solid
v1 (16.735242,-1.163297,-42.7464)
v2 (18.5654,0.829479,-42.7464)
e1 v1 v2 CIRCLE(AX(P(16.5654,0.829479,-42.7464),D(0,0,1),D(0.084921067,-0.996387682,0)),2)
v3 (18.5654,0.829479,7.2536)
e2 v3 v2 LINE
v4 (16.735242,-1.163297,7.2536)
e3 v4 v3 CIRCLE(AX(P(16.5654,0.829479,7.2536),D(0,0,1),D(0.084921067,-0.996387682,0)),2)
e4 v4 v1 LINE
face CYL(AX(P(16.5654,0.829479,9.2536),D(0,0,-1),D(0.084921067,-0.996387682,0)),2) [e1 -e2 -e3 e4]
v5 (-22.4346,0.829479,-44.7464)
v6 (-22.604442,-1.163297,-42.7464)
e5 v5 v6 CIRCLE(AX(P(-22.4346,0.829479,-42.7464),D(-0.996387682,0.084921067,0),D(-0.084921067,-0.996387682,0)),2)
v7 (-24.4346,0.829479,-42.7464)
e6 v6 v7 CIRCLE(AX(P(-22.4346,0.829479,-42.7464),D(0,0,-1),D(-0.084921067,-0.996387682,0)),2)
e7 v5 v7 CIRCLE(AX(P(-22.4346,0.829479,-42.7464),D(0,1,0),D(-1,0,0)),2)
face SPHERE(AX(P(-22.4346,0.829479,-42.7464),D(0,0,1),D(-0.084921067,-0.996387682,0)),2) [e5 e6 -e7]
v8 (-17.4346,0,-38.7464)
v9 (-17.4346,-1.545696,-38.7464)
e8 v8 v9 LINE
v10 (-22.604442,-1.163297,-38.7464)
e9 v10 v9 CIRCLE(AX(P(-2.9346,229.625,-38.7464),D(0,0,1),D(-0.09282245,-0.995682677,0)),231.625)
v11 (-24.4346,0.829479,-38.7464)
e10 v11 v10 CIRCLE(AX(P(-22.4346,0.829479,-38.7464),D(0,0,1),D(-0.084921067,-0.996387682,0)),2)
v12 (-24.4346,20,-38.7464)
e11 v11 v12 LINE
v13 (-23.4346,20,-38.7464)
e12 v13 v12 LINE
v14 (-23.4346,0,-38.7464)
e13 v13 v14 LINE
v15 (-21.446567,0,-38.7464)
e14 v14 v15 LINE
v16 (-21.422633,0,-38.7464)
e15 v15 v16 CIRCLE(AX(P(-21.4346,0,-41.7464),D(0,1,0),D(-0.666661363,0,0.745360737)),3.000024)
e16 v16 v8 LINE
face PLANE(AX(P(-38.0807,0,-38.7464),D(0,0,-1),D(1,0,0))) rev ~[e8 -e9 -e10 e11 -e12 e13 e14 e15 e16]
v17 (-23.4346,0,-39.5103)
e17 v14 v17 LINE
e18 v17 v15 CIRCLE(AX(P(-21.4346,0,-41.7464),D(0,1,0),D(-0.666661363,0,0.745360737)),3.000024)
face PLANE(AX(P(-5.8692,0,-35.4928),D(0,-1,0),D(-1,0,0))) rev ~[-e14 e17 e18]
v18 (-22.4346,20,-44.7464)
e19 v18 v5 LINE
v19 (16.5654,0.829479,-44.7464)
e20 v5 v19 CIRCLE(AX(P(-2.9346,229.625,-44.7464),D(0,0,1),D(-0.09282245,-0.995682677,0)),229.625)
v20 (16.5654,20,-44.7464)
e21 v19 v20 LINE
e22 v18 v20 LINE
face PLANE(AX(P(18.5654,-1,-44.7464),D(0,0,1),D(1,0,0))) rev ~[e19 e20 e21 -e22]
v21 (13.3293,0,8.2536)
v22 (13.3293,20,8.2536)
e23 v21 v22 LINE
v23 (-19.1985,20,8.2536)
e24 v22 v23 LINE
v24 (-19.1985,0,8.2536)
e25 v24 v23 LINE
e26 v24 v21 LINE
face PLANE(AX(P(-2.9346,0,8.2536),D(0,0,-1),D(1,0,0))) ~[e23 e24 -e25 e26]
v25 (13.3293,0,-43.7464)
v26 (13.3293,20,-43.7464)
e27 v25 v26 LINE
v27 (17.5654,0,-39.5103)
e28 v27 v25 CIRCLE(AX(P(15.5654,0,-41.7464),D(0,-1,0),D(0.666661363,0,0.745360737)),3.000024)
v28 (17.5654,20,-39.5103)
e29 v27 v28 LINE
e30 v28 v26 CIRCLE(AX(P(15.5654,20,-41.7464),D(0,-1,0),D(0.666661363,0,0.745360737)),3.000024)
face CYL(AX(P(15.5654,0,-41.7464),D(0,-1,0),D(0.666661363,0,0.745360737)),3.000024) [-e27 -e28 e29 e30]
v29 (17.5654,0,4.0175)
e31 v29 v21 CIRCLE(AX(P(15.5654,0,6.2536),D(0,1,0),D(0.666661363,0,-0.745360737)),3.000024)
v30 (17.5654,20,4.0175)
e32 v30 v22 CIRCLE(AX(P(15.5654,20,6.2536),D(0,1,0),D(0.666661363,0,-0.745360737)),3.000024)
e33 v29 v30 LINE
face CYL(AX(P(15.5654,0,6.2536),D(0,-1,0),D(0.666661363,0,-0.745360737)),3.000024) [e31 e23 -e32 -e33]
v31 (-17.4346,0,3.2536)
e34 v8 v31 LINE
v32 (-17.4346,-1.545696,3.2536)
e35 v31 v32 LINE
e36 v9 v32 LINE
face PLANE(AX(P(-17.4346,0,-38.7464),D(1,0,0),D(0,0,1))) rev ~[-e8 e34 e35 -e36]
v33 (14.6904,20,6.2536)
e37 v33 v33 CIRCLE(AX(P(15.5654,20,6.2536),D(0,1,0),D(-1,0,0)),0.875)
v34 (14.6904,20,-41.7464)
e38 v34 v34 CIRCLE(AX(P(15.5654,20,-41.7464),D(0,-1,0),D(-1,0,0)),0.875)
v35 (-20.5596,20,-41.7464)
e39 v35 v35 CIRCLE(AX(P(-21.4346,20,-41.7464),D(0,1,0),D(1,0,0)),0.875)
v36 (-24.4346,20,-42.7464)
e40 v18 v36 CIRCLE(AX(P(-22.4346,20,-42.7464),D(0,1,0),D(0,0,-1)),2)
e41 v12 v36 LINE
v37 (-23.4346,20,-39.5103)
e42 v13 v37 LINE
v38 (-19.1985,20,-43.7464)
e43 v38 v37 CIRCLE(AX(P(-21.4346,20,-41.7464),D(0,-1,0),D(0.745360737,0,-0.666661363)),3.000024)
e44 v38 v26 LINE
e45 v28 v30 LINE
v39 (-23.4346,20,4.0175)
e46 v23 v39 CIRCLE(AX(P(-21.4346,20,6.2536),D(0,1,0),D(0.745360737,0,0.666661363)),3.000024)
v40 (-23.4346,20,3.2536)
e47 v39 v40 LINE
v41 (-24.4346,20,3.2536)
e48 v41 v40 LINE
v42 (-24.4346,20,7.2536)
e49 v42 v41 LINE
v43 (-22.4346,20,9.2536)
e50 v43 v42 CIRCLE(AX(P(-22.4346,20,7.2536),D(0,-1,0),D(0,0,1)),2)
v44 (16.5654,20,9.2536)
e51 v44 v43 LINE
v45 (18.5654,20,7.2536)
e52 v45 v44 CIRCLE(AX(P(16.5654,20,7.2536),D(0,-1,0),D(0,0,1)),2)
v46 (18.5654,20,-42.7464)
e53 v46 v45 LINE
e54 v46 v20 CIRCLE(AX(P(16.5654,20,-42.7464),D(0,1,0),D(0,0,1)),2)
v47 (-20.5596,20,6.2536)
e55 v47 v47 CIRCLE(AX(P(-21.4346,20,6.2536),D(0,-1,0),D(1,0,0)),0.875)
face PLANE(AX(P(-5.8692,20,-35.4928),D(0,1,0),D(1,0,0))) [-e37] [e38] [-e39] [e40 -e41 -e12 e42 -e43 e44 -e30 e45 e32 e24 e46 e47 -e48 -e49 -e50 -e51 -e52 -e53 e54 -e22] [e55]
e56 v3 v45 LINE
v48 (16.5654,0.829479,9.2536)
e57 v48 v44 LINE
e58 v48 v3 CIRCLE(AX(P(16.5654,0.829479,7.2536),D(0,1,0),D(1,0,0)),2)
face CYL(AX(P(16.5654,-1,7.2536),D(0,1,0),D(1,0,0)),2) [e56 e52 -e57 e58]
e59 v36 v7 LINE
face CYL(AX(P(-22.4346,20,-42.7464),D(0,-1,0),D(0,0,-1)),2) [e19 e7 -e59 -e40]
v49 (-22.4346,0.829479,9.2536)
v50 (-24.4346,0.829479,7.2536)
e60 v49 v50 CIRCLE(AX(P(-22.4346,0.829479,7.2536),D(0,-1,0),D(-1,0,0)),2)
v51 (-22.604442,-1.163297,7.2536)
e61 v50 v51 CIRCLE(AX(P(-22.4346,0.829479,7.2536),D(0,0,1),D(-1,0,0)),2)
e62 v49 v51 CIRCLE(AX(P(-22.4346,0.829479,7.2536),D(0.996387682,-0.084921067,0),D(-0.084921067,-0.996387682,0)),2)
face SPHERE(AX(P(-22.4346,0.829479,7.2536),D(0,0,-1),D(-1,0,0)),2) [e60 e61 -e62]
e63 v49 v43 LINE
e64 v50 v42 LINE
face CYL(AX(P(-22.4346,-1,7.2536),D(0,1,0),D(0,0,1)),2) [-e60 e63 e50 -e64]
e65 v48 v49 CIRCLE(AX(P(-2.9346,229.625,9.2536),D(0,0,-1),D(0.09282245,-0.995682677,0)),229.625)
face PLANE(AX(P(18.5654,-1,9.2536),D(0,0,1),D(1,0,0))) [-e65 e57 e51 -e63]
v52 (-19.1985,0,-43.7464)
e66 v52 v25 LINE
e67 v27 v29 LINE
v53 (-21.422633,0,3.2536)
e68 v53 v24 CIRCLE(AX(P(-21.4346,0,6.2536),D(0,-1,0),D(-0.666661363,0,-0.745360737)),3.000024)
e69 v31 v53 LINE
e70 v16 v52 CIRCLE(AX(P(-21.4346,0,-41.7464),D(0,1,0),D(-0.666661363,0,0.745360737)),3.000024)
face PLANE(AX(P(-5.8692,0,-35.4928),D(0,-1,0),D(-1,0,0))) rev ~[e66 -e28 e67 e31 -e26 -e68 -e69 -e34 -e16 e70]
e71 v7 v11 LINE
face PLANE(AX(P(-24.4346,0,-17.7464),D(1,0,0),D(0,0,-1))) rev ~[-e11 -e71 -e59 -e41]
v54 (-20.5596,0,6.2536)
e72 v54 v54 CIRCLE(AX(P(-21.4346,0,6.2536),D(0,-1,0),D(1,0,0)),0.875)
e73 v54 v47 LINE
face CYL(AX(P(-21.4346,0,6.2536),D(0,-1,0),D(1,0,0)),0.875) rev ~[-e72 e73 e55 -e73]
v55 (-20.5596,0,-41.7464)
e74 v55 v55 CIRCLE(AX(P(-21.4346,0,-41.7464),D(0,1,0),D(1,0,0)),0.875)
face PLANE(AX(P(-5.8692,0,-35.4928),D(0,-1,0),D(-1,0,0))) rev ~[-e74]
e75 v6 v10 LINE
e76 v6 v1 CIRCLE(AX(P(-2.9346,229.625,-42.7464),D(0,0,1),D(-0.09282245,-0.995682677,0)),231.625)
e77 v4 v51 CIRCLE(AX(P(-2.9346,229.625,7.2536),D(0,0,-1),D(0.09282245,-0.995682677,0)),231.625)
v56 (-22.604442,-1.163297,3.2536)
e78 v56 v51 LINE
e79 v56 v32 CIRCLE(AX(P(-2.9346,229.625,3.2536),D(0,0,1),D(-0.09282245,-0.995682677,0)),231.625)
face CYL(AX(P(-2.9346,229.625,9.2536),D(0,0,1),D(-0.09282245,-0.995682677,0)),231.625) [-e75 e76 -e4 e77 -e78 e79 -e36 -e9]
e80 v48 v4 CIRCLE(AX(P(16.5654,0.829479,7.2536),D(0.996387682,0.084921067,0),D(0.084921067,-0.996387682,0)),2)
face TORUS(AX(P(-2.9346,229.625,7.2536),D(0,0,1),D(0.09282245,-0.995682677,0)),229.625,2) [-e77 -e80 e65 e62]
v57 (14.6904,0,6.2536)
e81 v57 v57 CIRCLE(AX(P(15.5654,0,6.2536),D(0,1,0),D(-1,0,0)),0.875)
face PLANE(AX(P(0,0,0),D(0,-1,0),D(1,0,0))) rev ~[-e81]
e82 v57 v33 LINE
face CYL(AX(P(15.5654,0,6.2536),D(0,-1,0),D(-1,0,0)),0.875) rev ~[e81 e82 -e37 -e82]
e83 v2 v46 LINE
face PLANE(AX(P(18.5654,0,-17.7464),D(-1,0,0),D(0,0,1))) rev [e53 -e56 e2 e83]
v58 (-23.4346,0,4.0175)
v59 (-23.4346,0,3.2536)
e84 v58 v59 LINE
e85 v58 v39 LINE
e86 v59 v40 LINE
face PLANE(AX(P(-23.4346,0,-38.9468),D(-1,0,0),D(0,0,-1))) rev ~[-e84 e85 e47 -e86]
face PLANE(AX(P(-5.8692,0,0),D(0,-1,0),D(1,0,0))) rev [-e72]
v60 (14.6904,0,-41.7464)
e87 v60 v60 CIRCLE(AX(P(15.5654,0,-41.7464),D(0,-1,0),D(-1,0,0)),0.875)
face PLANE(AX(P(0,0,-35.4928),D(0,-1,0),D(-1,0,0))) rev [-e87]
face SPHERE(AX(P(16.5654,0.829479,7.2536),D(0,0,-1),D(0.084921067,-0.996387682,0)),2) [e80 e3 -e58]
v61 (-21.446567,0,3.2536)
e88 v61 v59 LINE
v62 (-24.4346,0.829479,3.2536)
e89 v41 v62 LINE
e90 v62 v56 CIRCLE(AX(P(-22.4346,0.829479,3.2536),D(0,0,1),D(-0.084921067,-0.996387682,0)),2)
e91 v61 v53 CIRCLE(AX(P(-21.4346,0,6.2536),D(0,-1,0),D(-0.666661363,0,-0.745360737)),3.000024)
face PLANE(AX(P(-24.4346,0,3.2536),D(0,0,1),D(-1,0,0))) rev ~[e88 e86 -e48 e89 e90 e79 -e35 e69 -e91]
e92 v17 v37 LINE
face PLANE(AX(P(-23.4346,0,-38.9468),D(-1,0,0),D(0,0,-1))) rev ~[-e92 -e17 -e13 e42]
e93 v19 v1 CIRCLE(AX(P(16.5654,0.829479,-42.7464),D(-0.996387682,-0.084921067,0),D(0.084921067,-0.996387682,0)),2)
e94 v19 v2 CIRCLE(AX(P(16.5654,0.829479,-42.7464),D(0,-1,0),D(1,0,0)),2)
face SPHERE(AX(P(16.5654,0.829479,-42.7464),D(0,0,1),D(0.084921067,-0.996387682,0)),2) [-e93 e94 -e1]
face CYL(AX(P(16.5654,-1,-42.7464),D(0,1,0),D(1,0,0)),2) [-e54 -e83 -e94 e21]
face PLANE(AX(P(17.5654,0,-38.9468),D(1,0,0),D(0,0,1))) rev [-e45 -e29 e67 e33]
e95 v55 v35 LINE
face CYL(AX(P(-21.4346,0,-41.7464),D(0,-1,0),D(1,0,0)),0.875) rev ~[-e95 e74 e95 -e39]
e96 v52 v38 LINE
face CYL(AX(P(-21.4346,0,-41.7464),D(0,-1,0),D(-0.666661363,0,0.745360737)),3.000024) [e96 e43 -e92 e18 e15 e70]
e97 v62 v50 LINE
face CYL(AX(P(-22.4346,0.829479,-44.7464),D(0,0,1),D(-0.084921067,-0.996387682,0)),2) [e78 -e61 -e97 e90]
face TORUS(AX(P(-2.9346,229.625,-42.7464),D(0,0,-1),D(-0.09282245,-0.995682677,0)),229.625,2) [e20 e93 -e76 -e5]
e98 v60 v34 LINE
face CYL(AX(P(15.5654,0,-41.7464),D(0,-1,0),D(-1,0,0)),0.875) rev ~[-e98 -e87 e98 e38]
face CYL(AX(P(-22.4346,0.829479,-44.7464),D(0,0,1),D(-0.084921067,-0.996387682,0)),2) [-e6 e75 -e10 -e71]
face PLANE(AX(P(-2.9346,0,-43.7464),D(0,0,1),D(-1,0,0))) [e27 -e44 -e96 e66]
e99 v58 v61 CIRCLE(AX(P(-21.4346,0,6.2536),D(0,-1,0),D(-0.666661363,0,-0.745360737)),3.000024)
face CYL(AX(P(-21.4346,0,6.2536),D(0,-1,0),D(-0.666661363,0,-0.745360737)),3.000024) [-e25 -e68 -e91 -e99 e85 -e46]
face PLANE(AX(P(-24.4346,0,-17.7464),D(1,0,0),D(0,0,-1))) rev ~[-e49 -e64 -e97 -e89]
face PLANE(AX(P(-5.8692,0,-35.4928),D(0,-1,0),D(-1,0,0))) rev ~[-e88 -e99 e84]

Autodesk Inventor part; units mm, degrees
ref_plane "YZ Plane" through (0, 0, 0) normal (1, 0, 0) x (0, 1, 0)
ref_plane "XZ Plane" through (0, 0, 0) normal (0, 1, 0) x (-1, 0, 0)
ref_plane "XY Plane" through (0, 0, 0) normal (0, 0, 1) x (1, 0, 0)
sketch "Sketch1" plane through (0, 0, 0) normal (0, 1, 0) x (-1, 0, 0)
  line L0 (-18.5654, 9.2536) -> (2.9346, 9.2536)
  line L1 (2.9346, 9.2536) -> (2.9346, -17.7464)
  line L2 (2.9346, -17.7464) -> (-18.5654, -17.7464)
  line L3 (-18.5654, -17.7464) -> (-18.5654, 9.2536)
  circle A0 centre (-15.5654, 6.2536) radius 0.875
  line L4 (-17.5654, 3.454) -> (-17.5654, -16.6136)
  line L5 (2.9346, 8.2536) -> (-13.3293, 8.2536)
  line L6 (-17.5654, 3.454) -> (-17.5654, 4.0175)
  line L7 (-17.5654, -16.6136) -> (-17.5654, -17.7464)
  arc A1 (-17.5654, 4.0175) -> (-13.3293, 8.2536) centre (-15.5654, 6.2536) ccw
  point P0 (0, 0)
  dimension "d0" = 21.5
  dimension "d2" = 27
  dimension "d3" = 3
  dimension "d4" = 3
  dimension "d6" = 1.75
  dimension "d7" = 1
  dimension "d8" = 1
extrude "Extrusion1" add sketch "Sketch1" along normal blind 20 contours L0 L1 L5 A1 L6 L4 L7 L2 L3
sketch "Sketch2" plane through (0, 0, 0) normal (0, -1, 0) x (1, 0, 0)
  line L0 (18.5654, 9.2536) -> (-2.9346, 9.2536)
  line L1 (-2.9346, 9.2536) -> (-2.9346, -17.7464)
  line L2 (-2.9346, -17.7464) -> (18.5654, -17.7464)
  line L3 (18.5654, -17.7464) -> (18.5654, 9.2536)
  point P0 (0, 0)
extrude "Extrusion2" add sketch "Sketch2" along normal blind 1
mirror "Mirror1" about plane through (18.5654, 0, -17.7464) normal (0, 0, -1) of "Extrusion1", "Extrusion2"
mirror "Mirror2" about plane through (-2.9346, 0, 8.2536) normal (-1, 0, 0) of "Extrusion1", "Extrusion2", "Mirror1"
sketch "Sketch3" plane through (18.5654, -1, 9.2536) normal (0, 0, 1) x (1, 0, 0)
  line L0 (0, 0) -> (-43, 0) projected
  arc A0 (-43, 0) -> (0, 0) centre (-21.5, 230.625) ccw
  line L1 (-40.8006, -1) -> (-1.6118, -1)
  point P0 (-18.5654, 1)
  dimension "d13" = 1
extrude "Extrusion3" add sketch "Sketch3" against normal blind 54
fillet "Fillet1" radius 2 8 edges at (-24.4346, -1, -17.7464) (-2.9346, -2, -44.7464) (-24.4346, 9.5, -44.7464) (18.5654, 9.5, -44.7464) (-24.4346, 9.5, 9.2536) (-2.9346, -2, 9.2536) (18.5654, 9.5, 9.2536) (18.5654, -1, -17.7464)
sketch "Sketch4" plane through (0, 0, 0) normal (0, 1, 0) x (1, 0, 0)
  line L0 (-38.0807, 38.7464) -> (-17.4346, 38.7464)
  line L1 (-17.4346, 38.7464) -> (-17.4346, -3.2536)
  line L2 (-17.4346, -3.2536) -> (-38.0807, -3.2536)
  line L3 (-38.0807, -3.2536) -> (-38.0807, 38.7464)
  line L4 (-24.4346, 42.7464) -> (-24.4346, -7.2536) projected
  arc A0 (-23.4346, 39.5104) -> (-19.1985, 43.7464) centre (-21.4346, 41.7464) ccw projected
  arc A1 (-19.1985, -8.2536) -> (-23.4346, -4.0175) centre (-21.4346, -6.2536) ccw projected
  point P0 (0, 0)
  dimension "d17" = 7
extrude "Extrusion4" cut sketch "Sketch4" along normal mid plane 50
properties part number "cuerpo"
